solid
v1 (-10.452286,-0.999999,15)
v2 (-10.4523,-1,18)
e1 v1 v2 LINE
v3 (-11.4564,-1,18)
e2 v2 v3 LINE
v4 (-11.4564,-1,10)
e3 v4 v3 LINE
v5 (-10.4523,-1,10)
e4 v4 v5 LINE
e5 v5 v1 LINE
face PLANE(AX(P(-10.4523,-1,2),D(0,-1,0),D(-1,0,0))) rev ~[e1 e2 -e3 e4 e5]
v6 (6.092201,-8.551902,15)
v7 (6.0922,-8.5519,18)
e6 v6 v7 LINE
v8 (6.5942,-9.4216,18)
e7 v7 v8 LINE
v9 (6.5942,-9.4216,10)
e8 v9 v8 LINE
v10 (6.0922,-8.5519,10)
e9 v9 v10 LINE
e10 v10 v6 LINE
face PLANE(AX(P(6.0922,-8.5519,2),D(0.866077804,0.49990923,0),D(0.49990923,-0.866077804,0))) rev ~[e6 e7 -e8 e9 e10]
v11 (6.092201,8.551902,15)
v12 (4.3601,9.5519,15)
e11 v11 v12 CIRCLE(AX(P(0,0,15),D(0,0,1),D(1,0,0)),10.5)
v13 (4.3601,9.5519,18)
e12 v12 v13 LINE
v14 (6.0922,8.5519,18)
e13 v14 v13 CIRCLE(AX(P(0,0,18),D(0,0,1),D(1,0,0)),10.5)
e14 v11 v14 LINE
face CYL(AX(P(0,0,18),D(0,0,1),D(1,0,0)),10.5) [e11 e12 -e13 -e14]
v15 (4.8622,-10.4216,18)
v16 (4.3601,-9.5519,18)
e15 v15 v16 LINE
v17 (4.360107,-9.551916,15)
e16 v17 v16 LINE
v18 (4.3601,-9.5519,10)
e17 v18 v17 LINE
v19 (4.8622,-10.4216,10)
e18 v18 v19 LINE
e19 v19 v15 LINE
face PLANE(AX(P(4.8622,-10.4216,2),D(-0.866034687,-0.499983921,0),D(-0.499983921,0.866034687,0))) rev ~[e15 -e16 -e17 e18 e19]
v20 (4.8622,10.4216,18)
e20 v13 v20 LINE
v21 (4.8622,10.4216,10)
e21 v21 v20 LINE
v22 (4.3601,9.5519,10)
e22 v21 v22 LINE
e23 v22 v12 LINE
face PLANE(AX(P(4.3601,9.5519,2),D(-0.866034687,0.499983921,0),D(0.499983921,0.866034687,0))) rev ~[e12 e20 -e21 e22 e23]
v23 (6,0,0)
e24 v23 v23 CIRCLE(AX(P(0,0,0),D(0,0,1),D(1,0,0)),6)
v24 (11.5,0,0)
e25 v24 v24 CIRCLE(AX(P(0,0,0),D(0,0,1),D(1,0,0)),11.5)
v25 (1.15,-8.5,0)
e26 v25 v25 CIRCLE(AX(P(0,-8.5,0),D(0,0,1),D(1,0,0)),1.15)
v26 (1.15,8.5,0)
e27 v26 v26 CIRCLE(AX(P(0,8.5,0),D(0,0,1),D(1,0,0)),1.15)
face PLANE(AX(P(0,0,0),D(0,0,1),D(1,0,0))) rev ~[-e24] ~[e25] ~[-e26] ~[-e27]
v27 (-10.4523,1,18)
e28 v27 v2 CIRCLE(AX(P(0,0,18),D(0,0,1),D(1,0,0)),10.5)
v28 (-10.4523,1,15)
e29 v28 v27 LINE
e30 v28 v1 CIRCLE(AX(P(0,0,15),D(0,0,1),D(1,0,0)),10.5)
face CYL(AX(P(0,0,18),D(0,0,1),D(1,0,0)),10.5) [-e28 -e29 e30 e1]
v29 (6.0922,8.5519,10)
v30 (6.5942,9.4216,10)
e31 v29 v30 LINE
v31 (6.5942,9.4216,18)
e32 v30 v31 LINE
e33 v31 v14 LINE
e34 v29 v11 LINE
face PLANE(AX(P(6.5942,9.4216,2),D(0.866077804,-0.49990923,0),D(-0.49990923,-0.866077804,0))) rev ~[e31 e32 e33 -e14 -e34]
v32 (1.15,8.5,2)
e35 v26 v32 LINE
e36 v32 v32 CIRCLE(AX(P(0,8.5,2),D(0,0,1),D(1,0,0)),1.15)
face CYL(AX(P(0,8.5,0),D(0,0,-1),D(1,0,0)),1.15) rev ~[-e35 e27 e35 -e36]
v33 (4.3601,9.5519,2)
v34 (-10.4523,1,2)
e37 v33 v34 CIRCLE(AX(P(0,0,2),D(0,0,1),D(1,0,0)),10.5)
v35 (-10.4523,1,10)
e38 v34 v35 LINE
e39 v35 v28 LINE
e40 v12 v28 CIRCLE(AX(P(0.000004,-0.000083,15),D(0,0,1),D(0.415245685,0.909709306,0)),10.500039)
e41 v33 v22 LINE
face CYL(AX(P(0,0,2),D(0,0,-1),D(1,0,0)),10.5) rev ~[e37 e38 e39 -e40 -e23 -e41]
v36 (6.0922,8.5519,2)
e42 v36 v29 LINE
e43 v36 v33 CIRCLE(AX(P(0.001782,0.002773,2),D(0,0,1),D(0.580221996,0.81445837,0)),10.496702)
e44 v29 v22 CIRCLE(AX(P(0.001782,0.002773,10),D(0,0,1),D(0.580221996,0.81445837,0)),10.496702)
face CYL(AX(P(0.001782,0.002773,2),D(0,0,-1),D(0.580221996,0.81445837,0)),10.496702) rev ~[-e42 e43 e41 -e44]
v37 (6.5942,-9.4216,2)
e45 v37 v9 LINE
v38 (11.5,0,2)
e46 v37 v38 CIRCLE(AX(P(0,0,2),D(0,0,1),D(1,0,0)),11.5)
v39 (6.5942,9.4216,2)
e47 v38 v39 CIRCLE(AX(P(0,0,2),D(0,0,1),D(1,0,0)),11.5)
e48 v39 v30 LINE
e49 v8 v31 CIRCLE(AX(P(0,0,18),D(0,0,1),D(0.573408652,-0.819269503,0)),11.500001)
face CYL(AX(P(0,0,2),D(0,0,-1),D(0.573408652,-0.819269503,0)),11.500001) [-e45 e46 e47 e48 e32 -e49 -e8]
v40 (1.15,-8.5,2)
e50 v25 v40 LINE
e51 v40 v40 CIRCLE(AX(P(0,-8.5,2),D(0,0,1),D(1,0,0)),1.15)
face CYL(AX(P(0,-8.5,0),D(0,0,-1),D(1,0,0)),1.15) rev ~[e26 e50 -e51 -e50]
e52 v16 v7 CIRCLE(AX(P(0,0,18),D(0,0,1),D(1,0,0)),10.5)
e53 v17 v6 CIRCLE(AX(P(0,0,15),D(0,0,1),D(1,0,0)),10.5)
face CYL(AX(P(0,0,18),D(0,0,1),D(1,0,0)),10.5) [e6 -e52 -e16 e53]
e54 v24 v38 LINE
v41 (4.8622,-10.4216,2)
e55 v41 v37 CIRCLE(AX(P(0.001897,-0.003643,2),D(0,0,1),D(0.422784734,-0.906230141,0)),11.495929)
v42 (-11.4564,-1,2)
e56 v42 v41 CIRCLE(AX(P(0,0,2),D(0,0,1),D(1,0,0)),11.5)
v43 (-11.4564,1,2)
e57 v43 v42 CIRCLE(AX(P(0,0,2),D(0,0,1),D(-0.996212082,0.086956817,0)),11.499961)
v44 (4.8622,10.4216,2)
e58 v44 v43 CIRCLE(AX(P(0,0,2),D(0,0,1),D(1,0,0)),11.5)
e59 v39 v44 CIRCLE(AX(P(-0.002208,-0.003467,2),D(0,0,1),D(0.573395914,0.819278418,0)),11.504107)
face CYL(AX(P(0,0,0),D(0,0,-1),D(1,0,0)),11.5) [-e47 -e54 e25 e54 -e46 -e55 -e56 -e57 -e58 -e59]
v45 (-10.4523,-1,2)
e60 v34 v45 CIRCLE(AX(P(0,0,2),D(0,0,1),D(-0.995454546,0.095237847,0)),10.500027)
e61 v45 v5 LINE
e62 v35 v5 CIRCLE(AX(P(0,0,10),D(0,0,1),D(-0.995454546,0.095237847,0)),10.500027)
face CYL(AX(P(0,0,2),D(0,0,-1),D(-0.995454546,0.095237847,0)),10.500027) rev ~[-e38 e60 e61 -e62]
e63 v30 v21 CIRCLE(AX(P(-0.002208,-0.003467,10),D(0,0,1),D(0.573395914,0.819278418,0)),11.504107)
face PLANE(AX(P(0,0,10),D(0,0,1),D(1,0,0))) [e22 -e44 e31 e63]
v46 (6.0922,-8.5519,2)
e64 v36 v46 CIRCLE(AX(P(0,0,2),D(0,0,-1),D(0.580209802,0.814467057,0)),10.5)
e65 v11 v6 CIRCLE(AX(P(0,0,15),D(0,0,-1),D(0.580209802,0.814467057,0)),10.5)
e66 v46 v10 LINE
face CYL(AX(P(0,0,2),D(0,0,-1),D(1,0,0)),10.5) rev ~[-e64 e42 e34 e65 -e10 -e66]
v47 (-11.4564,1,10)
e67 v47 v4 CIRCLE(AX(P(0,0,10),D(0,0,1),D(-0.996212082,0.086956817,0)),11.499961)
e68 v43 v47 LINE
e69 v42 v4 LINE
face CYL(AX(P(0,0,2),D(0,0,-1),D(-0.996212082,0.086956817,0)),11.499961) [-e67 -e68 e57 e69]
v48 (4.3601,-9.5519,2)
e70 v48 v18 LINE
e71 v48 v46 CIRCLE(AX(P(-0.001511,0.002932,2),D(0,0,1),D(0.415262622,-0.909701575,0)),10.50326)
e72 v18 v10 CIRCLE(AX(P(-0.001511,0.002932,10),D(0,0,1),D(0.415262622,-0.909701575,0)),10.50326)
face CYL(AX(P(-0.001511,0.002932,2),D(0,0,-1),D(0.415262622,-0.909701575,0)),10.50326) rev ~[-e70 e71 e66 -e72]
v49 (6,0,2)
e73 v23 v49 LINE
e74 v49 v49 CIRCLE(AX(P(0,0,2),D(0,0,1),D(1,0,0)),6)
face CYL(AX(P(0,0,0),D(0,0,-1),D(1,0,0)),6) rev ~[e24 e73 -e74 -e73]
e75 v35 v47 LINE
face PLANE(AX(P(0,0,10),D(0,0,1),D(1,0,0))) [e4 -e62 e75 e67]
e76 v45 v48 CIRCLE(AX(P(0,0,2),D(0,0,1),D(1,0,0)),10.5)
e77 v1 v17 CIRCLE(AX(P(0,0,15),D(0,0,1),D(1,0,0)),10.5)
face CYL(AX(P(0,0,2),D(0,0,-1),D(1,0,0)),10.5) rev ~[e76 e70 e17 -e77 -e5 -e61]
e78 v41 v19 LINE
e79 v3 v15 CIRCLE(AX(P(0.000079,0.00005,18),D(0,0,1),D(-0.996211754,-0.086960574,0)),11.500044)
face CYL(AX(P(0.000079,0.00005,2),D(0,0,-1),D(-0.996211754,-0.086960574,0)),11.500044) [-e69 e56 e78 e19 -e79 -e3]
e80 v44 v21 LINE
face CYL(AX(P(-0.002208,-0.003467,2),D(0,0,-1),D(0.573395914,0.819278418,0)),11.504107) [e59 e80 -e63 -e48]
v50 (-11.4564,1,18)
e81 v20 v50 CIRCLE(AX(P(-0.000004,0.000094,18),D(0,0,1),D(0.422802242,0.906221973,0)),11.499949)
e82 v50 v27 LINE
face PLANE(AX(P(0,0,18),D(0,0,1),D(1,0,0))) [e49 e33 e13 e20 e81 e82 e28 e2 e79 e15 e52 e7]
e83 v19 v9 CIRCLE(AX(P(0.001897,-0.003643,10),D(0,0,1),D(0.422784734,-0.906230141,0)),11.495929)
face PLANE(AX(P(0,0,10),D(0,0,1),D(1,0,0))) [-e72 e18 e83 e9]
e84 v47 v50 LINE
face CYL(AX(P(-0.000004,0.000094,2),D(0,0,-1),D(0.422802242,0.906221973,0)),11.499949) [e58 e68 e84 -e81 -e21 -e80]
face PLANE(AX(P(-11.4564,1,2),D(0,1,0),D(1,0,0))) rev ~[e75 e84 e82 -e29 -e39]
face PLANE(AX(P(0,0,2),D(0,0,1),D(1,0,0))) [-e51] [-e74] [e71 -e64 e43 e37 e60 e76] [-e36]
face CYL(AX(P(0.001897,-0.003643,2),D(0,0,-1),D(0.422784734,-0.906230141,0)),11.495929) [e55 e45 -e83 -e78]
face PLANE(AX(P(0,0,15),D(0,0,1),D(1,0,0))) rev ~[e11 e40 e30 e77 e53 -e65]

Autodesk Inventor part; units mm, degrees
ref_plane "YZ Plane" through (0, 0, 0) normal (1, 0, 0) x (0, 1, 0)
ref_plane "XZ Plane" through (0, 0, 0) normal (0, 1, 0) x (-1, 0, 0)
ref_plane "XY Plane" through (0, 0, 0) normal (0, 0, 1) x (1, 0, 0)
sketch "Skizze1" plane through (0, 0, 0) normal (0, 0, 1) x (1, 0, 0)
  circle A0 centre (0, 0) radius 11.5
  circle A1 centre (0, 0) radius 8.5 construction
  circle A2 centre (0, 8.5) radius 1.15
  circle A3 centre (0, -8.5) radius 1.15
  line L0 (0, 16.1) -> (0, -16.1) construction
  circle A4 centre (0, 0) radius 6
  dimension "MEncoder_OuterDia" = 23
  dimension "MEncoder_FixationHole_Dia" = 17
  dimension "d2" = 2.3
  dimension "d3" = 2.3
  dimension "MagneticEnc_Magnet_PassHole" = 12
extrude "Montageplatte" add sketch "Skizze1" along normal blind 2
sketch "Skizze2" plane through (0, 0, 2) normal (0, 0, 1) x (1, 0, 0)
  line L0 (-10.4523, 1) -> (-11.4564, 1)
  line L1 (-11.4564, -1) -> (-10.4523, -1)
  line L2 (-10.4523, 1) -> (-11.5781, -1) construction
  line L3 (-11.5781, 1) -> (-10.4523, -1) construction
  line L4 (-16.1937, 0) -> (16.1156, 0) construction
  circle A0 centre (0, 0) radius 11.5 construction
  circle A1 centre (0, 0) radius 11.5 construction
  arc A2 (-11.4564, 1) -> (-11.4564, -1) centre (0, 0) ccw
  circle A3 centre (0, 0) radius 10.5 construction
  arc A4 (-10.4523, 1) -> (-10.4523, -1) centre (0, 0) ccw
  line L5 (4.3601, -9.5519) -> (4.8622, -10.4216)
  line L6 (6.5942, -9.4216) -> (6.0922, -8.5519)
  line L7 (4.3601, -9.5519) -> (6.6551, -9.5269) construction
  line L8 (4.923, -10.5269) -> (6.0922, -8.5519) construction
  arc A5 (4.8622, -10.4216) -> (6.5942, -9.4216) centre (0, 0) ccw
  arc A6 (4.3601, -9.5519) -> (6.0922, -8.5519) centre (0, 0) ccw
  line L9 (6.0922, 8.5519) -> (6.5942, 9.4216)
  line L10 (4.8622, 10.4216) -> (4.3601, 9.5519)
  line L11 (6.0922, 8.5519) -> (4.923, 10.5269) construction
  line L12 (6.6551, 9.5269) -> (4.3601, 9.5519) construction
  arc A7 (6.5942, 9.4216) -> (4.8622, 10.4216) centre (0, 0) ccw
  arc A8 (6.0922, 8.5519) -> (4.3601, 9.5519) centre (0, 0) ccw
  point P0 (-11.0152, 0)
  point P1 (-11.0152, 0)
  point P2 (-11.0152, 0)
  point P3 (-11.5, 0)
  point P4 (5.5076, -9.5394)
  point P5 (5.5076, -9.5394)
  point P6 (5.5076, -9.5394)
  point P7 (5.75, -9.9593)
  point P8 (5.5076, 9.5394)
  point P9 (5.5076, 9.5394)
  point P10 (5.5076, 9.5394)
  point P11 (5.75, 9.9593)
  dimension "d10" = 2
  dimension "d17" = 2
  dimension "d24" = 1
  dimension "d25" = 1
  dimension "d36" = 21
  dimension "d39" = 360
extrude "Schnaphebel" add sketch "Skizze2" along normal blind 8
sketch "Skizze3" plane through (0, 0, 2) normal (0, 0, 1) x (1, 0, 0)
  circle A0 centre (0, 0) radius 10.5
  line L0 (4.8622, -10.4216) -> (4.3601, -9.5519) projected
  arc A1 (4.3601, -9.5519) -> (6.0922, -8.5519) centre (0, 0) ccw projected
  line L1 (6.0922, -8.5519) -> (6.5942, -9.4216) projected
  arc A2 (6.5942, -9.4216) -> (6.5942, 9.4216) centre (0, 0) ccw projected
  line L2 (6.5942, 9.4216) -> (6.0922, 8.5519) projected
  arc A3 (6.0922, 8.5519) -> (4.3601, 9.5519) centre (0, 0) ccw projected
  line L3 (4.3601, 9.5519) -> (4.8622, 10.4216) projected
  arc A4 (4.8622, 10.4216) -> (-11.4564, 1) centre (0, 0) ccw projected
  line L4 (-11.4564, 1) -> (-10.4523, 1) projected
  arc A5 (-10.4523, 1) -> (-10.4523, -1) centre (0, 0) ccw projected
  line L5 (-10.4523, -1) -> (-11.4564, -1) projected
  arc A6 (-11.4564, -1) -> (4.8622, -10.4216) centre (0, 0) ccw projected
  circle A7 centre (0, 8.5) radius 1.15 projected
  circle A8 centre (0, -8.5) radius 1.15 projected
  circle A9 centre (0, 0) radius 6 projected
  dimension "d41" = 21
extrude "Sensorabdeckung" add sketch "Skizze3" along normal blind 16 contours A0 L2 A2 L1 | A0 L4 A4 L3 | L0 A6 L5 A0
sketch "Skizze4" plane through (0, 0, 18) normal (0, 0, 1) x (1, 0, 0)
  circle A0 centre (0, 0) radius 10.5
  arc A1 (4.3601, 9.5519) -> (-10.4523, 1) centre (0, 0) ccw projected
extrude "Sensorabdeckung Deckel" add sketch "Skizze4" against normal blind 3
properties part number "Magnetic Encoder" material "Polylactid (PLA) black"
